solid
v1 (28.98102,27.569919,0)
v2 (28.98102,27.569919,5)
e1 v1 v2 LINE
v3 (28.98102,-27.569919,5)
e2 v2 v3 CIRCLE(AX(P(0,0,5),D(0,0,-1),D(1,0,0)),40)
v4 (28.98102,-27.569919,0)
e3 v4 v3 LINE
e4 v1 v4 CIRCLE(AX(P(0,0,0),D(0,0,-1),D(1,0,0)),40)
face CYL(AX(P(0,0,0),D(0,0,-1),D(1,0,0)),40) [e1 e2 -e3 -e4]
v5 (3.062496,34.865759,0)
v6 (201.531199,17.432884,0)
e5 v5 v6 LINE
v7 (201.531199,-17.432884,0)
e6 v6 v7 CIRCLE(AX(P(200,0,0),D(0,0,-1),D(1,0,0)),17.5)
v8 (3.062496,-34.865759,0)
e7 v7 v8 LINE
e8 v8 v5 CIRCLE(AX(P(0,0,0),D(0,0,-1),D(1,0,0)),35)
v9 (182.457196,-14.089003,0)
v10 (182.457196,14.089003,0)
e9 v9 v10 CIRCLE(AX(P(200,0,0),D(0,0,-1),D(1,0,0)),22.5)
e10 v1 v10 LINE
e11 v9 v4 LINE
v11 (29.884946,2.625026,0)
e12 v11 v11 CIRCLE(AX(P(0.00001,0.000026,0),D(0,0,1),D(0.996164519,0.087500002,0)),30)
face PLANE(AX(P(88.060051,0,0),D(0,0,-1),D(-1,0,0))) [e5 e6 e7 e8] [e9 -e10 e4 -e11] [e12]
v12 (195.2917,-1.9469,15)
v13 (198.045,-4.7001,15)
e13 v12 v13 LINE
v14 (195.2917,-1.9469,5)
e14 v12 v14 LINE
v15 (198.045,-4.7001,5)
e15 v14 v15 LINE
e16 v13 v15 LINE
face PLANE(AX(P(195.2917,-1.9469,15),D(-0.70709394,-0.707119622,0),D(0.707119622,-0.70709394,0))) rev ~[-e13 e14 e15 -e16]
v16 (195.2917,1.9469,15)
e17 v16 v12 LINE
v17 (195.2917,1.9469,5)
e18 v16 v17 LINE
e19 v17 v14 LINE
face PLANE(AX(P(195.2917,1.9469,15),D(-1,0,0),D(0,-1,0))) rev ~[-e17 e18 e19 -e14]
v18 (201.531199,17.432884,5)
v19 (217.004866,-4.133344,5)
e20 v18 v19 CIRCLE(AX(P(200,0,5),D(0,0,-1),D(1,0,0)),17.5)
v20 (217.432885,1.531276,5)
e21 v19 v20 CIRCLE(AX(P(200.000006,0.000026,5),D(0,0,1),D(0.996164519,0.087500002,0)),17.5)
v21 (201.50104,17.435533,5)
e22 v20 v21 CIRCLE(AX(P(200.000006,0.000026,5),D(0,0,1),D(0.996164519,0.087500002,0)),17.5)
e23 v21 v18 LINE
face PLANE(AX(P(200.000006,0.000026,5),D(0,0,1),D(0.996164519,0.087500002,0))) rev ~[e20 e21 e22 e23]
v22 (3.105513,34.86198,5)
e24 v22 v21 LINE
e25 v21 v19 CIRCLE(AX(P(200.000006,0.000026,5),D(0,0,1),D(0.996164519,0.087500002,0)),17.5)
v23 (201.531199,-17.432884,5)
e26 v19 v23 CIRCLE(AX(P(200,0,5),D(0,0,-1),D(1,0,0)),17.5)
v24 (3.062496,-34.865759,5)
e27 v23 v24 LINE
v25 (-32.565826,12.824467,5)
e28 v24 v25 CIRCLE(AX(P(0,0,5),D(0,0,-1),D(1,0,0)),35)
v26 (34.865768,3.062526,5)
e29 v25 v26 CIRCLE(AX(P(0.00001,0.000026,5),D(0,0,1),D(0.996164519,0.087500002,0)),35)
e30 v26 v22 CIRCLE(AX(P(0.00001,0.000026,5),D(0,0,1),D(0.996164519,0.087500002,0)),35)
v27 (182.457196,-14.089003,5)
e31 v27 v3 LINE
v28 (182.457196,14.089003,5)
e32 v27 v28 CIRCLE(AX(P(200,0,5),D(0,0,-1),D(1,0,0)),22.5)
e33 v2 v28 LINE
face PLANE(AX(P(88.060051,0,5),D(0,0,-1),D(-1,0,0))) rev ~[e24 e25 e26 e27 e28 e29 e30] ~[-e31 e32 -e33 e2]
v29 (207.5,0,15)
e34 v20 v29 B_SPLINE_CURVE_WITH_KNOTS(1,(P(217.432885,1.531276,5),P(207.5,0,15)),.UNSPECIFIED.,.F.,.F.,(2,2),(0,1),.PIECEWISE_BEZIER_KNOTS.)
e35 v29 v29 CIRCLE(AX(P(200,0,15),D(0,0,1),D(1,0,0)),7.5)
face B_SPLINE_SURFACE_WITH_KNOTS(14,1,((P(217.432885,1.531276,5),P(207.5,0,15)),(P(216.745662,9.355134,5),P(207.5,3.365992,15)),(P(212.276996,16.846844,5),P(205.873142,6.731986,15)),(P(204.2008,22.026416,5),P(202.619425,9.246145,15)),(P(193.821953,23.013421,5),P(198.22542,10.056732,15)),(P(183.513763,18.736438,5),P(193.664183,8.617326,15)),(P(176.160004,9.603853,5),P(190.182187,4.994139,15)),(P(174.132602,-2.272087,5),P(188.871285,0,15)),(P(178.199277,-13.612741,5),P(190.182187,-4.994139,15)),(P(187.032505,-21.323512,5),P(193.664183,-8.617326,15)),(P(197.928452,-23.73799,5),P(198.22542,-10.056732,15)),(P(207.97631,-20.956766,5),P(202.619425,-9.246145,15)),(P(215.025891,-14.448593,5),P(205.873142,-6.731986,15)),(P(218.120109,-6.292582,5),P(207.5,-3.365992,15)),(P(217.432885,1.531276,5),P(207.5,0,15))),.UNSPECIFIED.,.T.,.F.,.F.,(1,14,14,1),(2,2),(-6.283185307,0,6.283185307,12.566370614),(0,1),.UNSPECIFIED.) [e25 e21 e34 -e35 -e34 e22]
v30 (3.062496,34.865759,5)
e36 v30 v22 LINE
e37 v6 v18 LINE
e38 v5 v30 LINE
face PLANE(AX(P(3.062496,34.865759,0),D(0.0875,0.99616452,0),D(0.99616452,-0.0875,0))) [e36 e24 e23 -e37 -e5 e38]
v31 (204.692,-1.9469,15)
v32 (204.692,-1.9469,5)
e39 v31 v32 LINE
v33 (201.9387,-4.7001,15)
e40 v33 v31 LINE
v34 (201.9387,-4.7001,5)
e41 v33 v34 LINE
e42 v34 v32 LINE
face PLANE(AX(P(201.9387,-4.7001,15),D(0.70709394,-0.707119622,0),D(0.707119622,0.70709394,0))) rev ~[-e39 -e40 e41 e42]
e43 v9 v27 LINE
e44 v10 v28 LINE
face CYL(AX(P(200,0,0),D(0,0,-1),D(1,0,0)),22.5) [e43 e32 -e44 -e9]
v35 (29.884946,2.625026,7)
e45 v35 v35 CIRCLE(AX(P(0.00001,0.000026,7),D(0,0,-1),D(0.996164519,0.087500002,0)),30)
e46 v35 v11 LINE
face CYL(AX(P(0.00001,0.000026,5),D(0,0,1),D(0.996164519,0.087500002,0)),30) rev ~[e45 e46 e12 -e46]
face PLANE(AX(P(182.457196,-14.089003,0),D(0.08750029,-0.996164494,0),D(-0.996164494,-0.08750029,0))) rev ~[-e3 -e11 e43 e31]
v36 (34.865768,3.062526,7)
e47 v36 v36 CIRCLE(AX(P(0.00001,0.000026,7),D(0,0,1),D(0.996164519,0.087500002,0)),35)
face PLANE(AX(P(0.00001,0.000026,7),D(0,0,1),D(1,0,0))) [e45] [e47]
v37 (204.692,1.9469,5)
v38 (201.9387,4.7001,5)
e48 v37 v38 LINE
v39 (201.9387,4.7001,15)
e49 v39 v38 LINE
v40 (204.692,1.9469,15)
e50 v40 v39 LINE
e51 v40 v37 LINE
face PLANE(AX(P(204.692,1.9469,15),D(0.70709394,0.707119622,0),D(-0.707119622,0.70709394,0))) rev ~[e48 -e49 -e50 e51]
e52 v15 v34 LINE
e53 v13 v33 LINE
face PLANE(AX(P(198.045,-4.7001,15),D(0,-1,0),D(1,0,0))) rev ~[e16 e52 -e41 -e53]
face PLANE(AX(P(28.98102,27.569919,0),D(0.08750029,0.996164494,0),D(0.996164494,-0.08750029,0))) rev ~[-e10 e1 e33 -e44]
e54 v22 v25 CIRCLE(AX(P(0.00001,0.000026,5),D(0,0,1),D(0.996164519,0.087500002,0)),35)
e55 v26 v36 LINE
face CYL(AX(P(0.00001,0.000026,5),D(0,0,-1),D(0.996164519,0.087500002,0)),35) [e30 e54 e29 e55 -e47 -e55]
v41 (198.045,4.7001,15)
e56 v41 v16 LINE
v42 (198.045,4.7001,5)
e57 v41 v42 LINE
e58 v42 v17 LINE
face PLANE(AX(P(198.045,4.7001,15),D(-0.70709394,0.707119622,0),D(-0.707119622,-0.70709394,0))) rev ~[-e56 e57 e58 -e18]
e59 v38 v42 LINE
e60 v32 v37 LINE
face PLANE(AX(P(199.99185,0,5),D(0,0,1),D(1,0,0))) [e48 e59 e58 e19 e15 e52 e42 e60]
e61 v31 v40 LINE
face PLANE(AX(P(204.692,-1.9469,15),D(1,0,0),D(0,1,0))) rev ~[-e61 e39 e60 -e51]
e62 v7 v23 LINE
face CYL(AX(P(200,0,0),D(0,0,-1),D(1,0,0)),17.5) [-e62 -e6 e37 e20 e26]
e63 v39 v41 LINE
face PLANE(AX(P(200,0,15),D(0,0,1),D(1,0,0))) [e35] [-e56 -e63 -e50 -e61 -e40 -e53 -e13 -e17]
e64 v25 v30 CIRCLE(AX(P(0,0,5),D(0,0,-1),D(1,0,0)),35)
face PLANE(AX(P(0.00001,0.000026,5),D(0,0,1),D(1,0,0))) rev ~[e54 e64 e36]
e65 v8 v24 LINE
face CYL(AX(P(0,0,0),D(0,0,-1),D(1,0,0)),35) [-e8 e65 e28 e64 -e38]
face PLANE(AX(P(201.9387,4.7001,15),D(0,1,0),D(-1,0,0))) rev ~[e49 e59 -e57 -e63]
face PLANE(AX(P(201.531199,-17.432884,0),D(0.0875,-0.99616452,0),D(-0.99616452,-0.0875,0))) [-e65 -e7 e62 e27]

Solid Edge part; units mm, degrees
sketch "Sketch1" plane through (0, 0, 0) normal (0, 0, 1) x (1, 0, 0)
  line L0 (201.5312, -17.4329) -> (3.0625, -34.8658)
  line L1 (3.0625, 34.8658) -> (201.5312, 17.4329)
  arc A0 (3.0625, -34.8658) -> (3.0625, 34.8658) centre (0, 0) cw
  arc A1 (201.5312, 17.4329) -> (201.5312, -17.4329) centre (200, 0) cw
extrude "Protrusion1" add sketch "Sketch1" along normal blind 5
sketch "Sketch2" plane through (91.25, 0, 5) normal (0, 0, 1) x (0.9961645, 0.0875, 0)
  circle A0 centre (-90.9, 7.9844) radius 35
extrude "ExtrudedProtrusion_2" add sketch "Sketch2" along normal blind 2
sketch "Sketch3" plane through (91.25, 0, 5) normal (0, 0, 1) x (0.9961645, 0.0875, 0)
  circle A0 centre (-90.9, 7.9844) radius 30
extrude "ExtrudedCutout_1" cut sketch "Sketch3" along normal mid plane 68.6664
sketch "Sketch4" plane through (91.25, 0, 5) normal (0, 0, 1) x (0.9961645, 0.0875, 0)
  circle A0 centre (108.3329, -9.5156) radius 17.5
sketch "Sketch5" plane through (0, 0, 15) normal (0, 0, 1) x (1, 0, 0)
  circle A0 centre (200, 0) radius 7.5
loft "LoftedProtrusion1" add profiles "Sketch4", "Sketch5"
sketch "Sketch6" plane through (0, 0, 15) normal (0, 0, 1) x (1, 0, 0)
  line L0 (195.2917, -1.9469) -> (198.045, -4.7001)
  line L1 (198.045, -4.7001) -> (201.9387, -4.7001)
  line L2 (201.9387, -4.7001) -> (204.692, -1.9469)
  line L3 (204.692, -1.9469) -> (204.692, 1.9469)
  line L4 (204.692, 1.9469) -> (201.9387, 4.7001)
  line L5 (201.9387, 4.7001) -> (198.045, 4.7001)
  line L6 (198.045, 4.7001) -> (195.2917, 1.9469)
  line L7 (195.2917, 1.9469) -> (195.2917, -1.9469)
extrude "ExtrudedCutout_2" cut sketch "Sketch6" against normal blind 10
sketch "Sketch7" plane through (0, 0, 0) normal (0, 0, 1) x (1, 0, 0)
  line L0 (28.981, 27.5699) -> (182.4572, 14.089)
  line L1 (182.4572, -14.089) -> (28.981, -27.5699)
  arc A0 (182.4572, -14.089) -> (182.4572, 14.089) centre (200, 0) cw
  arc A1 (28.981, 27.5699) -> (28.981, -27.5699) centre (0, 0) cw
extrude "ExtrudedCutout_4" cut sketch "Sketch7" along normal blind 65.4531
